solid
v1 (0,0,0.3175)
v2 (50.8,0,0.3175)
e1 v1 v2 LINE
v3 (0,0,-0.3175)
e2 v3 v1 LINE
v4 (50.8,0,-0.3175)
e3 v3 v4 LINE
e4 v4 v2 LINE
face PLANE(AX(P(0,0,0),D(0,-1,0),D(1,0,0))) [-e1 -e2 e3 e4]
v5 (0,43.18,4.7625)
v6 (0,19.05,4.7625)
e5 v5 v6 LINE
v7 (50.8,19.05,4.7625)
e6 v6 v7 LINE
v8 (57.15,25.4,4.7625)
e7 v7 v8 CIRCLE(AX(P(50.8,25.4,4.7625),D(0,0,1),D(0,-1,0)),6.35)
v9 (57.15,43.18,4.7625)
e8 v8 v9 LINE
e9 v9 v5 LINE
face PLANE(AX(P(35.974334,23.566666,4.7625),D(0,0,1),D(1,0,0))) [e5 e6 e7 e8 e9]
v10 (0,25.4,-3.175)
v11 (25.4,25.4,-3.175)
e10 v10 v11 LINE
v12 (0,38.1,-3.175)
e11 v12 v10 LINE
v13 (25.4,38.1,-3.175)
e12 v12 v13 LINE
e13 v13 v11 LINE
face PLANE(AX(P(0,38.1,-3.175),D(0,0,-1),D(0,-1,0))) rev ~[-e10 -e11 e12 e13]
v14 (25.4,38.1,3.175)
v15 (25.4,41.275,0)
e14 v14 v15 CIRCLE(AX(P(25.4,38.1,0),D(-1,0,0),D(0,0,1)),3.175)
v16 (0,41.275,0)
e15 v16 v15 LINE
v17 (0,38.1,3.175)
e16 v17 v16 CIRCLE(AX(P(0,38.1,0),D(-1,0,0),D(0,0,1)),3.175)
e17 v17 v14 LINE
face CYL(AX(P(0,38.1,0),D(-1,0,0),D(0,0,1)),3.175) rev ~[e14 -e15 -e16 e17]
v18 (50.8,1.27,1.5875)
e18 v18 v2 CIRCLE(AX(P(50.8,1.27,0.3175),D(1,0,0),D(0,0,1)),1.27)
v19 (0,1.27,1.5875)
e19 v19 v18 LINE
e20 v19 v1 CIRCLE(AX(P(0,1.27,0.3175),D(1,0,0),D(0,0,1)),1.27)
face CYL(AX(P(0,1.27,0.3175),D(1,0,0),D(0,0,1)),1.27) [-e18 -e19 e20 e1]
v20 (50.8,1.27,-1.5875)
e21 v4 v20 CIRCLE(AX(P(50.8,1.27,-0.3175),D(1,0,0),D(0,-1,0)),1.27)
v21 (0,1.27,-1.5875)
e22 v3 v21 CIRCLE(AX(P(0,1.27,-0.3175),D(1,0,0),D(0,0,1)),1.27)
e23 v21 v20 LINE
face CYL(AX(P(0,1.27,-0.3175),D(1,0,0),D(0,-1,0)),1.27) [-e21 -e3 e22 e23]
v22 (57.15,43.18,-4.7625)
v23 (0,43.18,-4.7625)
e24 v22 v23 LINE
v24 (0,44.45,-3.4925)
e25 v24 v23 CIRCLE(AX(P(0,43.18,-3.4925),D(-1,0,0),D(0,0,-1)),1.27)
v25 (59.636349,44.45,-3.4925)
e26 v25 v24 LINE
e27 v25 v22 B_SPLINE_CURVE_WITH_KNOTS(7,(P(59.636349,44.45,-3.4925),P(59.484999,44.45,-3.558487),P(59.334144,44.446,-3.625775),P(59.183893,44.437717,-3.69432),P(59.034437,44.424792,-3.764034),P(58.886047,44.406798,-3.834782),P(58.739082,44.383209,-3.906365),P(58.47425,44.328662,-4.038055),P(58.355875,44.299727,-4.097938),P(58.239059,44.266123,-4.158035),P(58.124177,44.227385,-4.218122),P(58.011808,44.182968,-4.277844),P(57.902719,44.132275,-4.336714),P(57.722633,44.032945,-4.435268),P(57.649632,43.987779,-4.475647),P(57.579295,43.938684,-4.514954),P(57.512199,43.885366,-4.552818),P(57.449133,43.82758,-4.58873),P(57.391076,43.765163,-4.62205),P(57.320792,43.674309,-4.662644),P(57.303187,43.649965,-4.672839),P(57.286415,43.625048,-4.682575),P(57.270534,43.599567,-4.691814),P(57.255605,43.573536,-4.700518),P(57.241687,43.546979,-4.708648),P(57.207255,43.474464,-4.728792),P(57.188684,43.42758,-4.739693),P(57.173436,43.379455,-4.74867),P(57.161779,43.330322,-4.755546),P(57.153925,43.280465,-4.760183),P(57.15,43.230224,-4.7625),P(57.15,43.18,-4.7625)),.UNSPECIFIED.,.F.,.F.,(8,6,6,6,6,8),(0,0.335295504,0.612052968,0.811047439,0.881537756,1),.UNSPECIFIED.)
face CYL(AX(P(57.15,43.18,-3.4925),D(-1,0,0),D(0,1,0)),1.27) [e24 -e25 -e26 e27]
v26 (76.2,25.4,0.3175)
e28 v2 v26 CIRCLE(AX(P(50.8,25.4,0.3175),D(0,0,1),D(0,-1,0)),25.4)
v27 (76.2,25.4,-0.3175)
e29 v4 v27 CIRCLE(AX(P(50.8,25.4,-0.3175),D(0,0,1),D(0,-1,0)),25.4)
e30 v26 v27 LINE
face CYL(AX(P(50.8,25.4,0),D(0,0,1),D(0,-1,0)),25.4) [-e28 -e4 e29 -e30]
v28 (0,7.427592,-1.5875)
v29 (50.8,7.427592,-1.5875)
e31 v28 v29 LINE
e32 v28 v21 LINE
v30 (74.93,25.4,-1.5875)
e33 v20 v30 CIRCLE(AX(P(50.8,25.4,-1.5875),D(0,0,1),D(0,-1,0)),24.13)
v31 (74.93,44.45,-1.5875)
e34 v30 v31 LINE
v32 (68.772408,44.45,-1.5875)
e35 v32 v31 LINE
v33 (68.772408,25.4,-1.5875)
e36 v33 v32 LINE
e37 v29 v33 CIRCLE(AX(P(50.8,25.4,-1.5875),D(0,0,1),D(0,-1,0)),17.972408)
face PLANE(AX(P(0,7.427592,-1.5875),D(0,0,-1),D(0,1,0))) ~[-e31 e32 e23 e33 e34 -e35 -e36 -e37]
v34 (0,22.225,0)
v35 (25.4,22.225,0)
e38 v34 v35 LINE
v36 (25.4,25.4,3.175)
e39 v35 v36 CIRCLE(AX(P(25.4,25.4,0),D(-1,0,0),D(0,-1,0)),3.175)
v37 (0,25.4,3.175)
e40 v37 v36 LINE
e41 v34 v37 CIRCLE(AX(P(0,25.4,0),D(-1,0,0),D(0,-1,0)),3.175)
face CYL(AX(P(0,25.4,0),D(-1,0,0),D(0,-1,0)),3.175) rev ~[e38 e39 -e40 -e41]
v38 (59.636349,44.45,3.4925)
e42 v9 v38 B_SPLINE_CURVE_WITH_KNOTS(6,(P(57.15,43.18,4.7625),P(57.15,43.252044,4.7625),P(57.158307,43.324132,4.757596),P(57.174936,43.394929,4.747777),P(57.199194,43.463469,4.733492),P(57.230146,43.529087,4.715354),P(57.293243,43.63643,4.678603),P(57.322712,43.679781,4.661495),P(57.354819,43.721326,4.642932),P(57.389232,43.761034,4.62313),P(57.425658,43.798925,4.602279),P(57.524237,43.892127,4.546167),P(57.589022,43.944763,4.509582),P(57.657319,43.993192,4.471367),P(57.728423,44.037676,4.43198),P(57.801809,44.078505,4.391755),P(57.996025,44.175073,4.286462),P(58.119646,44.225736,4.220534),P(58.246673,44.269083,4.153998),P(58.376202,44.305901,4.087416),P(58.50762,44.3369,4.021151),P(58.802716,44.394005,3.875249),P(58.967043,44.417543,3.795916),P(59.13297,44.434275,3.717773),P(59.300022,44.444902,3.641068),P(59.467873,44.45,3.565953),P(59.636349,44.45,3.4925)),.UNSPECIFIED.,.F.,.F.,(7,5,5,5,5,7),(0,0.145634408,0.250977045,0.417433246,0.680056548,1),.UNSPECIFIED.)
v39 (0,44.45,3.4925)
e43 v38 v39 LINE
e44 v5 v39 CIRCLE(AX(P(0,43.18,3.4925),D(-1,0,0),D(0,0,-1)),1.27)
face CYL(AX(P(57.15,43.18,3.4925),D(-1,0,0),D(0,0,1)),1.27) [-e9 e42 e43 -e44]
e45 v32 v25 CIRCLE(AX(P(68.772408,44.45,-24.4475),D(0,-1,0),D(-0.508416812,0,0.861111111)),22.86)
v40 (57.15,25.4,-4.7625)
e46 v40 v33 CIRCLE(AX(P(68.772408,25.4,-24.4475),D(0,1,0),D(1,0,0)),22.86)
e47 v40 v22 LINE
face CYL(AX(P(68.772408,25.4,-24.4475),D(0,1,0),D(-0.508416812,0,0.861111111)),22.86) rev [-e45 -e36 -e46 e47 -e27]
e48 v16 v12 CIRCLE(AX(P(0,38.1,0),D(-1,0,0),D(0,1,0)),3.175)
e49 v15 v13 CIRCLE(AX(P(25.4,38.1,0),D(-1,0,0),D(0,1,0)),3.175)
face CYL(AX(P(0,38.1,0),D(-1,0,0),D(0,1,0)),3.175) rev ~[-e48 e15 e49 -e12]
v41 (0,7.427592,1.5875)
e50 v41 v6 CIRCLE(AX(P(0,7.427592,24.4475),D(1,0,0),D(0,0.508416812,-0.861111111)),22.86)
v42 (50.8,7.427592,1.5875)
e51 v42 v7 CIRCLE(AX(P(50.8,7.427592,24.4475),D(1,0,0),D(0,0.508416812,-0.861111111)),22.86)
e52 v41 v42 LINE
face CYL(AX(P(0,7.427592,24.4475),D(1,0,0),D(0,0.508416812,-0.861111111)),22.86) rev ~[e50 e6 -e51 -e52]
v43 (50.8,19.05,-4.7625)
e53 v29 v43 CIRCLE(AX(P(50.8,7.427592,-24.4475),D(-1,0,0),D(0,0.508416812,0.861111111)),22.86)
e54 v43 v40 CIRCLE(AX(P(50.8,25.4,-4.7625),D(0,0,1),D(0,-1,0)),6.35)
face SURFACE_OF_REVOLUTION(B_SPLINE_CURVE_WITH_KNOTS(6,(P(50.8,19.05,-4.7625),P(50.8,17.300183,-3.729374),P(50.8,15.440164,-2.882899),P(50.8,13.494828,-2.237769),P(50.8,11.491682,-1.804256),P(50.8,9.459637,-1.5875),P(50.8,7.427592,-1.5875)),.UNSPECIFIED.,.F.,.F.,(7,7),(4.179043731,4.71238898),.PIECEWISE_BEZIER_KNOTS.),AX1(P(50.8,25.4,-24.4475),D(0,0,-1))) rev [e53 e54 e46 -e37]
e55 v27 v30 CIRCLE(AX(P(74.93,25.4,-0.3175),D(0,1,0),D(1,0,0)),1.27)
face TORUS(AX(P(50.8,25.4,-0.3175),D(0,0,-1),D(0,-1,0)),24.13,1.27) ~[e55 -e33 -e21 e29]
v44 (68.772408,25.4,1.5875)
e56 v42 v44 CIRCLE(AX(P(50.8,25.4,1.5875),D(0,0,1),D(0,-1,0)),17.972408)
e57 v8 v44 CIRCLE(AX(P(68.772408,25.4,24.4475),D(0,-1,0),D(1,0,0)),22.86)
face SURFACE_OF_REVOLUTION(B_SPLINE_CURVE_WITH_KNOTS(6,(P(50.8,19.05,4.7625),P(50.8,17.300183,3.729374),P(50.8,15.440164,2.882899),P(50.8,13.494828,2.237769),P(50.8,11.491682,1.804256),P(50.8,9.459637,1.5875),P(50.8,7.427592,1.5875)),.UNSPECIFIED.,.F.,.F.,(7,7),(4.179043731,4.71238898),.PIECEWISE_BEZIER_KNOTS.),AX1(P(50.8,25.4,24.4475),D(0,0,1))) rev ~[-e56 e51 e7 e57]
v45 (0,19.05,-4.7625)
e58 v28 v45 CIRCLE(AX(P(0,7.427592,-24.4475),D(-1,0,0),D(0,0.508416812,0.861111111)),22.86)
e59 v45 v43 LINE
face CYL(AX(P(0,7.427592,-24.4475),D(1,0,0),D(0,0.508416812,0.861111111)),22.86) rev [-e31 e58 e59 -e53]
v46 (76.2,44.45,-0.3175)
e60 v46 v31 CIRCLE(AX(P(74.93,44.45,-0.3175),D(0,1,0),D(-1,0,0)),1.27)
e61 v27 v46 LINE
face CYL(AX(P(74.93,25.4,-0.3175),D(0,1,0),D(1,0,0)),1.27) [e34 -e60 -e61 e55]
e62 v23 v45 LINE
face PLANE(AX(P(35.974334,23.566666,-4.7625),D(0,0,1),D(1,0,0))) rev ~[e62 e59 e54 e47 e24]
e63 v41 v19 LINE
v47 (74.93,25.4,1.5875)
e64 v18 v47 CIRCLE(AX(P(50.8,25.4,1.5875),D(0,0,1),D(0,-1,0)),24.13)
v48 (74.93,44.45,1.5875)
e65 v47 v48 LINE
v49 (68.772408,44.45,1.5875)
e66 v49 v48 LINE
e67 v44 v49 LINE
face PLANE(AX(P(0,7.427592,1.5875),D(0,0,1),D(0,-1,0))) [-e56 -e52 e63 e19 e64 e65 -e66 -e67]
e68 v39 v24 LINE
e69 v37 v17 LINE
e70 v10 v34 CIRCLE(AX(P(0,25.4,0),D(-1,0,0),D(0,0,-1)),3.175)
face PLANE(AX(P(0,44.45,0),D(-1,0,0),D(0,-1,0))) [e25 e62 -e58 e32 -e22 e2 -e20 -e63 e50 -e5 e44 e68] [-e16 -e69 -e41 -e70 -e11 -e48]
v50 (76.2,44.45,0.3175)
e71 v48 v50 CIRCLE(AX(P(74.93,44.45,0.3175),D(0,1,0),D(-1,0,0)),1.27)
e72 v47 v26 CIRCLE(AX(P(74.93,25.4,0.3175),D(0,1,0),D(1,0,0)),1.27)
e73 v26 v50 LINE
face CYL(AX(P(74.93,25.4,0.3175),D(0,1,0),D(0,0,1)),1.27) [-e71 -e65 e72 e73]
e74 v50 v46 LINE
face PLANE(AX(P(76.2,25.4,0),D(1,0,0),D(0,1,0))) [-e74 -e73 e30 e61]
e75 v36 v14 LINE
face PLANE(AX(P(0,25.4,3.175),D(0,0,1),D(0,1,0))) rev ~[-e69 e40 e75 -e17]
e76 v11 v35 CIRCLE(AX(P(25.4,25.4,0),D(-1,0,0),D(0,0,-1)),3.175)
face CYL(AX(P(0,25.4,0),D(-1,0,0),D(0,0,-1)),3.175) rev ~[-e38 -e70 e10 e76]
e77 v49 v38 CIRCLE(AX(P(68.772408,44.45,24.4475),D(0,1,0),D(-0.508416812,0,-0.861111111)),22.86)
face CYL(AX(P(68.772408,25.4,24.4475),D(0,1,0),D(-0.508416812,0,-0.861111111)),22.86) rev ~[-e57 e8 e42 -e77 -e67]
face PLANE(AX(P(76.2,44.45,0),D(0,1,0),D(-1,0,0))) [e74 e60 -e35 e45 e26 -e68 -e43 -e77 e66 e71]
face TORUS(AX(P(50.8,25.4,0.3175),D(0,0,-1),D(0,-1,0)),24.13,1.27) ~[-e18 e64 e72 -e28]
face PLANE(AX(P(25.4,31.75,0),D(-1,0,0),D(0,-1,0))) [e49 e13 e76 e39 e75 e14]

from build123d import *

# Parameters (mm, degrees)
F1_DEPTH = 4.7625
F8_DEPTH = 25.4
F9_R     = 1.27


with BuildPart() as f1:
    # F0 (on Top) → F1 (new body, symmetric)
    with BuildSketch(Plane.XY):
        with BuildLine():
            Line((0, 44.45), (0, 0))
            Line((0, 0), (50.8, 0))
            ThreePointArc((50.8, 0), (68.7605122421, 7.4394877579), (76.2, 25.4))
            Line((76.2, 25.4), (76.2, 44.45))
            Line((76.2, 44.45), (0, 44.45))
        make_face()
    extrude(amount=F1_DEPTH, both=True)


with BuildPart() as f4:
    # F4: sweep along a path in F3
    with BuildLine(Plane.XY.offset(4.7625)) as f4_path:
        Line((0, 0), (50.8, 0))
        ThreePointArc((50.8, 0), (68.7605122421, 7.4394877579), (76.2, 25.4))
        Line((76.2, 25.4), (76.2, 44.45))
    # F2 (on face) → F4 (sweep)
    with BuildSketch(Plane(origin=(0, 0, 0), x_dir=(0, -1, 0), z_dir=(-1, 0, 0))):
        with BuildLine():
            Line((0, 4.7625), (-19.05, 4.7625))
            ThreePointArc((-19.05, 4.7625), (-13.4517306294, 2.3955307002), (-7.4275916867, 1.5875))
            Line((-7.4275916867, 1.5875), (0, 1.5875))
            Line((0, 1.5875), (0, 4.7625))
        make_face()
    sweep(path=f4_path.line)


with BuildPart() as f5_1:
    # F5: instance of F4
    add(f4.part.mirror(Plane.XY))


with BuildPart() as f1_1:
    add(f1.part)

    # F6: cut F4, F5_1
    add(f4.part, mode=Mode.SUBTRACT)
    add(f5_1.part, mode=Mode.SUBTRACT)

    # F7 (on face) → F8 (cut)
    with BuildSketch(Plane(origin=(0, 0, 0), x_dir=(0, -1, 0), z_dir=(-1, 0, 0))):
        with BuildLine():
            Line((-38.1, -3.175), (-25.4, -3.175))
            ThreePointArc((-25.4, -3.175), (-23.1549359697, -2.2450640303), (-22.225, 0))
            ThreePointArc((-22.225, 0), (-23.1549359697, 2.2450640303), (-25.4, 3.175))
            Line((-25.4, 3.175), (-38.1, 3.175))
            ThreePointArc((-38.1, 3.175), (-40.3450640303, 2.2450640303), (-41.275, 0))
            ThreePointArc((-41.275, 0), (-40.3450640303, -2.2450640303), (-38.1, -3.175))
        make_face()
    extrude(amount=-F8_DEPTH, mode=Mode.SUBTRACT)

    # F9
    f9_edges = [f1_1.edges().sort_by_distance(p)[0] for p in [
        (28.575, 44.45, 4.7625),
        (28.575, 44.45, -4.7625),
        (25.4, 0, 1.5875),
        (68.760512, 7.439488, 1.5875),
        (76.2, 34.925, 1.5875),
        (25.4, 0, -1.5875),
        (68.760512, 7.439488, -1.5875),
        (76.2, 34.925, -1.5875),
    ]]
    fillet(f9_edges, radius=F9_R)


solid = f1_1.part
